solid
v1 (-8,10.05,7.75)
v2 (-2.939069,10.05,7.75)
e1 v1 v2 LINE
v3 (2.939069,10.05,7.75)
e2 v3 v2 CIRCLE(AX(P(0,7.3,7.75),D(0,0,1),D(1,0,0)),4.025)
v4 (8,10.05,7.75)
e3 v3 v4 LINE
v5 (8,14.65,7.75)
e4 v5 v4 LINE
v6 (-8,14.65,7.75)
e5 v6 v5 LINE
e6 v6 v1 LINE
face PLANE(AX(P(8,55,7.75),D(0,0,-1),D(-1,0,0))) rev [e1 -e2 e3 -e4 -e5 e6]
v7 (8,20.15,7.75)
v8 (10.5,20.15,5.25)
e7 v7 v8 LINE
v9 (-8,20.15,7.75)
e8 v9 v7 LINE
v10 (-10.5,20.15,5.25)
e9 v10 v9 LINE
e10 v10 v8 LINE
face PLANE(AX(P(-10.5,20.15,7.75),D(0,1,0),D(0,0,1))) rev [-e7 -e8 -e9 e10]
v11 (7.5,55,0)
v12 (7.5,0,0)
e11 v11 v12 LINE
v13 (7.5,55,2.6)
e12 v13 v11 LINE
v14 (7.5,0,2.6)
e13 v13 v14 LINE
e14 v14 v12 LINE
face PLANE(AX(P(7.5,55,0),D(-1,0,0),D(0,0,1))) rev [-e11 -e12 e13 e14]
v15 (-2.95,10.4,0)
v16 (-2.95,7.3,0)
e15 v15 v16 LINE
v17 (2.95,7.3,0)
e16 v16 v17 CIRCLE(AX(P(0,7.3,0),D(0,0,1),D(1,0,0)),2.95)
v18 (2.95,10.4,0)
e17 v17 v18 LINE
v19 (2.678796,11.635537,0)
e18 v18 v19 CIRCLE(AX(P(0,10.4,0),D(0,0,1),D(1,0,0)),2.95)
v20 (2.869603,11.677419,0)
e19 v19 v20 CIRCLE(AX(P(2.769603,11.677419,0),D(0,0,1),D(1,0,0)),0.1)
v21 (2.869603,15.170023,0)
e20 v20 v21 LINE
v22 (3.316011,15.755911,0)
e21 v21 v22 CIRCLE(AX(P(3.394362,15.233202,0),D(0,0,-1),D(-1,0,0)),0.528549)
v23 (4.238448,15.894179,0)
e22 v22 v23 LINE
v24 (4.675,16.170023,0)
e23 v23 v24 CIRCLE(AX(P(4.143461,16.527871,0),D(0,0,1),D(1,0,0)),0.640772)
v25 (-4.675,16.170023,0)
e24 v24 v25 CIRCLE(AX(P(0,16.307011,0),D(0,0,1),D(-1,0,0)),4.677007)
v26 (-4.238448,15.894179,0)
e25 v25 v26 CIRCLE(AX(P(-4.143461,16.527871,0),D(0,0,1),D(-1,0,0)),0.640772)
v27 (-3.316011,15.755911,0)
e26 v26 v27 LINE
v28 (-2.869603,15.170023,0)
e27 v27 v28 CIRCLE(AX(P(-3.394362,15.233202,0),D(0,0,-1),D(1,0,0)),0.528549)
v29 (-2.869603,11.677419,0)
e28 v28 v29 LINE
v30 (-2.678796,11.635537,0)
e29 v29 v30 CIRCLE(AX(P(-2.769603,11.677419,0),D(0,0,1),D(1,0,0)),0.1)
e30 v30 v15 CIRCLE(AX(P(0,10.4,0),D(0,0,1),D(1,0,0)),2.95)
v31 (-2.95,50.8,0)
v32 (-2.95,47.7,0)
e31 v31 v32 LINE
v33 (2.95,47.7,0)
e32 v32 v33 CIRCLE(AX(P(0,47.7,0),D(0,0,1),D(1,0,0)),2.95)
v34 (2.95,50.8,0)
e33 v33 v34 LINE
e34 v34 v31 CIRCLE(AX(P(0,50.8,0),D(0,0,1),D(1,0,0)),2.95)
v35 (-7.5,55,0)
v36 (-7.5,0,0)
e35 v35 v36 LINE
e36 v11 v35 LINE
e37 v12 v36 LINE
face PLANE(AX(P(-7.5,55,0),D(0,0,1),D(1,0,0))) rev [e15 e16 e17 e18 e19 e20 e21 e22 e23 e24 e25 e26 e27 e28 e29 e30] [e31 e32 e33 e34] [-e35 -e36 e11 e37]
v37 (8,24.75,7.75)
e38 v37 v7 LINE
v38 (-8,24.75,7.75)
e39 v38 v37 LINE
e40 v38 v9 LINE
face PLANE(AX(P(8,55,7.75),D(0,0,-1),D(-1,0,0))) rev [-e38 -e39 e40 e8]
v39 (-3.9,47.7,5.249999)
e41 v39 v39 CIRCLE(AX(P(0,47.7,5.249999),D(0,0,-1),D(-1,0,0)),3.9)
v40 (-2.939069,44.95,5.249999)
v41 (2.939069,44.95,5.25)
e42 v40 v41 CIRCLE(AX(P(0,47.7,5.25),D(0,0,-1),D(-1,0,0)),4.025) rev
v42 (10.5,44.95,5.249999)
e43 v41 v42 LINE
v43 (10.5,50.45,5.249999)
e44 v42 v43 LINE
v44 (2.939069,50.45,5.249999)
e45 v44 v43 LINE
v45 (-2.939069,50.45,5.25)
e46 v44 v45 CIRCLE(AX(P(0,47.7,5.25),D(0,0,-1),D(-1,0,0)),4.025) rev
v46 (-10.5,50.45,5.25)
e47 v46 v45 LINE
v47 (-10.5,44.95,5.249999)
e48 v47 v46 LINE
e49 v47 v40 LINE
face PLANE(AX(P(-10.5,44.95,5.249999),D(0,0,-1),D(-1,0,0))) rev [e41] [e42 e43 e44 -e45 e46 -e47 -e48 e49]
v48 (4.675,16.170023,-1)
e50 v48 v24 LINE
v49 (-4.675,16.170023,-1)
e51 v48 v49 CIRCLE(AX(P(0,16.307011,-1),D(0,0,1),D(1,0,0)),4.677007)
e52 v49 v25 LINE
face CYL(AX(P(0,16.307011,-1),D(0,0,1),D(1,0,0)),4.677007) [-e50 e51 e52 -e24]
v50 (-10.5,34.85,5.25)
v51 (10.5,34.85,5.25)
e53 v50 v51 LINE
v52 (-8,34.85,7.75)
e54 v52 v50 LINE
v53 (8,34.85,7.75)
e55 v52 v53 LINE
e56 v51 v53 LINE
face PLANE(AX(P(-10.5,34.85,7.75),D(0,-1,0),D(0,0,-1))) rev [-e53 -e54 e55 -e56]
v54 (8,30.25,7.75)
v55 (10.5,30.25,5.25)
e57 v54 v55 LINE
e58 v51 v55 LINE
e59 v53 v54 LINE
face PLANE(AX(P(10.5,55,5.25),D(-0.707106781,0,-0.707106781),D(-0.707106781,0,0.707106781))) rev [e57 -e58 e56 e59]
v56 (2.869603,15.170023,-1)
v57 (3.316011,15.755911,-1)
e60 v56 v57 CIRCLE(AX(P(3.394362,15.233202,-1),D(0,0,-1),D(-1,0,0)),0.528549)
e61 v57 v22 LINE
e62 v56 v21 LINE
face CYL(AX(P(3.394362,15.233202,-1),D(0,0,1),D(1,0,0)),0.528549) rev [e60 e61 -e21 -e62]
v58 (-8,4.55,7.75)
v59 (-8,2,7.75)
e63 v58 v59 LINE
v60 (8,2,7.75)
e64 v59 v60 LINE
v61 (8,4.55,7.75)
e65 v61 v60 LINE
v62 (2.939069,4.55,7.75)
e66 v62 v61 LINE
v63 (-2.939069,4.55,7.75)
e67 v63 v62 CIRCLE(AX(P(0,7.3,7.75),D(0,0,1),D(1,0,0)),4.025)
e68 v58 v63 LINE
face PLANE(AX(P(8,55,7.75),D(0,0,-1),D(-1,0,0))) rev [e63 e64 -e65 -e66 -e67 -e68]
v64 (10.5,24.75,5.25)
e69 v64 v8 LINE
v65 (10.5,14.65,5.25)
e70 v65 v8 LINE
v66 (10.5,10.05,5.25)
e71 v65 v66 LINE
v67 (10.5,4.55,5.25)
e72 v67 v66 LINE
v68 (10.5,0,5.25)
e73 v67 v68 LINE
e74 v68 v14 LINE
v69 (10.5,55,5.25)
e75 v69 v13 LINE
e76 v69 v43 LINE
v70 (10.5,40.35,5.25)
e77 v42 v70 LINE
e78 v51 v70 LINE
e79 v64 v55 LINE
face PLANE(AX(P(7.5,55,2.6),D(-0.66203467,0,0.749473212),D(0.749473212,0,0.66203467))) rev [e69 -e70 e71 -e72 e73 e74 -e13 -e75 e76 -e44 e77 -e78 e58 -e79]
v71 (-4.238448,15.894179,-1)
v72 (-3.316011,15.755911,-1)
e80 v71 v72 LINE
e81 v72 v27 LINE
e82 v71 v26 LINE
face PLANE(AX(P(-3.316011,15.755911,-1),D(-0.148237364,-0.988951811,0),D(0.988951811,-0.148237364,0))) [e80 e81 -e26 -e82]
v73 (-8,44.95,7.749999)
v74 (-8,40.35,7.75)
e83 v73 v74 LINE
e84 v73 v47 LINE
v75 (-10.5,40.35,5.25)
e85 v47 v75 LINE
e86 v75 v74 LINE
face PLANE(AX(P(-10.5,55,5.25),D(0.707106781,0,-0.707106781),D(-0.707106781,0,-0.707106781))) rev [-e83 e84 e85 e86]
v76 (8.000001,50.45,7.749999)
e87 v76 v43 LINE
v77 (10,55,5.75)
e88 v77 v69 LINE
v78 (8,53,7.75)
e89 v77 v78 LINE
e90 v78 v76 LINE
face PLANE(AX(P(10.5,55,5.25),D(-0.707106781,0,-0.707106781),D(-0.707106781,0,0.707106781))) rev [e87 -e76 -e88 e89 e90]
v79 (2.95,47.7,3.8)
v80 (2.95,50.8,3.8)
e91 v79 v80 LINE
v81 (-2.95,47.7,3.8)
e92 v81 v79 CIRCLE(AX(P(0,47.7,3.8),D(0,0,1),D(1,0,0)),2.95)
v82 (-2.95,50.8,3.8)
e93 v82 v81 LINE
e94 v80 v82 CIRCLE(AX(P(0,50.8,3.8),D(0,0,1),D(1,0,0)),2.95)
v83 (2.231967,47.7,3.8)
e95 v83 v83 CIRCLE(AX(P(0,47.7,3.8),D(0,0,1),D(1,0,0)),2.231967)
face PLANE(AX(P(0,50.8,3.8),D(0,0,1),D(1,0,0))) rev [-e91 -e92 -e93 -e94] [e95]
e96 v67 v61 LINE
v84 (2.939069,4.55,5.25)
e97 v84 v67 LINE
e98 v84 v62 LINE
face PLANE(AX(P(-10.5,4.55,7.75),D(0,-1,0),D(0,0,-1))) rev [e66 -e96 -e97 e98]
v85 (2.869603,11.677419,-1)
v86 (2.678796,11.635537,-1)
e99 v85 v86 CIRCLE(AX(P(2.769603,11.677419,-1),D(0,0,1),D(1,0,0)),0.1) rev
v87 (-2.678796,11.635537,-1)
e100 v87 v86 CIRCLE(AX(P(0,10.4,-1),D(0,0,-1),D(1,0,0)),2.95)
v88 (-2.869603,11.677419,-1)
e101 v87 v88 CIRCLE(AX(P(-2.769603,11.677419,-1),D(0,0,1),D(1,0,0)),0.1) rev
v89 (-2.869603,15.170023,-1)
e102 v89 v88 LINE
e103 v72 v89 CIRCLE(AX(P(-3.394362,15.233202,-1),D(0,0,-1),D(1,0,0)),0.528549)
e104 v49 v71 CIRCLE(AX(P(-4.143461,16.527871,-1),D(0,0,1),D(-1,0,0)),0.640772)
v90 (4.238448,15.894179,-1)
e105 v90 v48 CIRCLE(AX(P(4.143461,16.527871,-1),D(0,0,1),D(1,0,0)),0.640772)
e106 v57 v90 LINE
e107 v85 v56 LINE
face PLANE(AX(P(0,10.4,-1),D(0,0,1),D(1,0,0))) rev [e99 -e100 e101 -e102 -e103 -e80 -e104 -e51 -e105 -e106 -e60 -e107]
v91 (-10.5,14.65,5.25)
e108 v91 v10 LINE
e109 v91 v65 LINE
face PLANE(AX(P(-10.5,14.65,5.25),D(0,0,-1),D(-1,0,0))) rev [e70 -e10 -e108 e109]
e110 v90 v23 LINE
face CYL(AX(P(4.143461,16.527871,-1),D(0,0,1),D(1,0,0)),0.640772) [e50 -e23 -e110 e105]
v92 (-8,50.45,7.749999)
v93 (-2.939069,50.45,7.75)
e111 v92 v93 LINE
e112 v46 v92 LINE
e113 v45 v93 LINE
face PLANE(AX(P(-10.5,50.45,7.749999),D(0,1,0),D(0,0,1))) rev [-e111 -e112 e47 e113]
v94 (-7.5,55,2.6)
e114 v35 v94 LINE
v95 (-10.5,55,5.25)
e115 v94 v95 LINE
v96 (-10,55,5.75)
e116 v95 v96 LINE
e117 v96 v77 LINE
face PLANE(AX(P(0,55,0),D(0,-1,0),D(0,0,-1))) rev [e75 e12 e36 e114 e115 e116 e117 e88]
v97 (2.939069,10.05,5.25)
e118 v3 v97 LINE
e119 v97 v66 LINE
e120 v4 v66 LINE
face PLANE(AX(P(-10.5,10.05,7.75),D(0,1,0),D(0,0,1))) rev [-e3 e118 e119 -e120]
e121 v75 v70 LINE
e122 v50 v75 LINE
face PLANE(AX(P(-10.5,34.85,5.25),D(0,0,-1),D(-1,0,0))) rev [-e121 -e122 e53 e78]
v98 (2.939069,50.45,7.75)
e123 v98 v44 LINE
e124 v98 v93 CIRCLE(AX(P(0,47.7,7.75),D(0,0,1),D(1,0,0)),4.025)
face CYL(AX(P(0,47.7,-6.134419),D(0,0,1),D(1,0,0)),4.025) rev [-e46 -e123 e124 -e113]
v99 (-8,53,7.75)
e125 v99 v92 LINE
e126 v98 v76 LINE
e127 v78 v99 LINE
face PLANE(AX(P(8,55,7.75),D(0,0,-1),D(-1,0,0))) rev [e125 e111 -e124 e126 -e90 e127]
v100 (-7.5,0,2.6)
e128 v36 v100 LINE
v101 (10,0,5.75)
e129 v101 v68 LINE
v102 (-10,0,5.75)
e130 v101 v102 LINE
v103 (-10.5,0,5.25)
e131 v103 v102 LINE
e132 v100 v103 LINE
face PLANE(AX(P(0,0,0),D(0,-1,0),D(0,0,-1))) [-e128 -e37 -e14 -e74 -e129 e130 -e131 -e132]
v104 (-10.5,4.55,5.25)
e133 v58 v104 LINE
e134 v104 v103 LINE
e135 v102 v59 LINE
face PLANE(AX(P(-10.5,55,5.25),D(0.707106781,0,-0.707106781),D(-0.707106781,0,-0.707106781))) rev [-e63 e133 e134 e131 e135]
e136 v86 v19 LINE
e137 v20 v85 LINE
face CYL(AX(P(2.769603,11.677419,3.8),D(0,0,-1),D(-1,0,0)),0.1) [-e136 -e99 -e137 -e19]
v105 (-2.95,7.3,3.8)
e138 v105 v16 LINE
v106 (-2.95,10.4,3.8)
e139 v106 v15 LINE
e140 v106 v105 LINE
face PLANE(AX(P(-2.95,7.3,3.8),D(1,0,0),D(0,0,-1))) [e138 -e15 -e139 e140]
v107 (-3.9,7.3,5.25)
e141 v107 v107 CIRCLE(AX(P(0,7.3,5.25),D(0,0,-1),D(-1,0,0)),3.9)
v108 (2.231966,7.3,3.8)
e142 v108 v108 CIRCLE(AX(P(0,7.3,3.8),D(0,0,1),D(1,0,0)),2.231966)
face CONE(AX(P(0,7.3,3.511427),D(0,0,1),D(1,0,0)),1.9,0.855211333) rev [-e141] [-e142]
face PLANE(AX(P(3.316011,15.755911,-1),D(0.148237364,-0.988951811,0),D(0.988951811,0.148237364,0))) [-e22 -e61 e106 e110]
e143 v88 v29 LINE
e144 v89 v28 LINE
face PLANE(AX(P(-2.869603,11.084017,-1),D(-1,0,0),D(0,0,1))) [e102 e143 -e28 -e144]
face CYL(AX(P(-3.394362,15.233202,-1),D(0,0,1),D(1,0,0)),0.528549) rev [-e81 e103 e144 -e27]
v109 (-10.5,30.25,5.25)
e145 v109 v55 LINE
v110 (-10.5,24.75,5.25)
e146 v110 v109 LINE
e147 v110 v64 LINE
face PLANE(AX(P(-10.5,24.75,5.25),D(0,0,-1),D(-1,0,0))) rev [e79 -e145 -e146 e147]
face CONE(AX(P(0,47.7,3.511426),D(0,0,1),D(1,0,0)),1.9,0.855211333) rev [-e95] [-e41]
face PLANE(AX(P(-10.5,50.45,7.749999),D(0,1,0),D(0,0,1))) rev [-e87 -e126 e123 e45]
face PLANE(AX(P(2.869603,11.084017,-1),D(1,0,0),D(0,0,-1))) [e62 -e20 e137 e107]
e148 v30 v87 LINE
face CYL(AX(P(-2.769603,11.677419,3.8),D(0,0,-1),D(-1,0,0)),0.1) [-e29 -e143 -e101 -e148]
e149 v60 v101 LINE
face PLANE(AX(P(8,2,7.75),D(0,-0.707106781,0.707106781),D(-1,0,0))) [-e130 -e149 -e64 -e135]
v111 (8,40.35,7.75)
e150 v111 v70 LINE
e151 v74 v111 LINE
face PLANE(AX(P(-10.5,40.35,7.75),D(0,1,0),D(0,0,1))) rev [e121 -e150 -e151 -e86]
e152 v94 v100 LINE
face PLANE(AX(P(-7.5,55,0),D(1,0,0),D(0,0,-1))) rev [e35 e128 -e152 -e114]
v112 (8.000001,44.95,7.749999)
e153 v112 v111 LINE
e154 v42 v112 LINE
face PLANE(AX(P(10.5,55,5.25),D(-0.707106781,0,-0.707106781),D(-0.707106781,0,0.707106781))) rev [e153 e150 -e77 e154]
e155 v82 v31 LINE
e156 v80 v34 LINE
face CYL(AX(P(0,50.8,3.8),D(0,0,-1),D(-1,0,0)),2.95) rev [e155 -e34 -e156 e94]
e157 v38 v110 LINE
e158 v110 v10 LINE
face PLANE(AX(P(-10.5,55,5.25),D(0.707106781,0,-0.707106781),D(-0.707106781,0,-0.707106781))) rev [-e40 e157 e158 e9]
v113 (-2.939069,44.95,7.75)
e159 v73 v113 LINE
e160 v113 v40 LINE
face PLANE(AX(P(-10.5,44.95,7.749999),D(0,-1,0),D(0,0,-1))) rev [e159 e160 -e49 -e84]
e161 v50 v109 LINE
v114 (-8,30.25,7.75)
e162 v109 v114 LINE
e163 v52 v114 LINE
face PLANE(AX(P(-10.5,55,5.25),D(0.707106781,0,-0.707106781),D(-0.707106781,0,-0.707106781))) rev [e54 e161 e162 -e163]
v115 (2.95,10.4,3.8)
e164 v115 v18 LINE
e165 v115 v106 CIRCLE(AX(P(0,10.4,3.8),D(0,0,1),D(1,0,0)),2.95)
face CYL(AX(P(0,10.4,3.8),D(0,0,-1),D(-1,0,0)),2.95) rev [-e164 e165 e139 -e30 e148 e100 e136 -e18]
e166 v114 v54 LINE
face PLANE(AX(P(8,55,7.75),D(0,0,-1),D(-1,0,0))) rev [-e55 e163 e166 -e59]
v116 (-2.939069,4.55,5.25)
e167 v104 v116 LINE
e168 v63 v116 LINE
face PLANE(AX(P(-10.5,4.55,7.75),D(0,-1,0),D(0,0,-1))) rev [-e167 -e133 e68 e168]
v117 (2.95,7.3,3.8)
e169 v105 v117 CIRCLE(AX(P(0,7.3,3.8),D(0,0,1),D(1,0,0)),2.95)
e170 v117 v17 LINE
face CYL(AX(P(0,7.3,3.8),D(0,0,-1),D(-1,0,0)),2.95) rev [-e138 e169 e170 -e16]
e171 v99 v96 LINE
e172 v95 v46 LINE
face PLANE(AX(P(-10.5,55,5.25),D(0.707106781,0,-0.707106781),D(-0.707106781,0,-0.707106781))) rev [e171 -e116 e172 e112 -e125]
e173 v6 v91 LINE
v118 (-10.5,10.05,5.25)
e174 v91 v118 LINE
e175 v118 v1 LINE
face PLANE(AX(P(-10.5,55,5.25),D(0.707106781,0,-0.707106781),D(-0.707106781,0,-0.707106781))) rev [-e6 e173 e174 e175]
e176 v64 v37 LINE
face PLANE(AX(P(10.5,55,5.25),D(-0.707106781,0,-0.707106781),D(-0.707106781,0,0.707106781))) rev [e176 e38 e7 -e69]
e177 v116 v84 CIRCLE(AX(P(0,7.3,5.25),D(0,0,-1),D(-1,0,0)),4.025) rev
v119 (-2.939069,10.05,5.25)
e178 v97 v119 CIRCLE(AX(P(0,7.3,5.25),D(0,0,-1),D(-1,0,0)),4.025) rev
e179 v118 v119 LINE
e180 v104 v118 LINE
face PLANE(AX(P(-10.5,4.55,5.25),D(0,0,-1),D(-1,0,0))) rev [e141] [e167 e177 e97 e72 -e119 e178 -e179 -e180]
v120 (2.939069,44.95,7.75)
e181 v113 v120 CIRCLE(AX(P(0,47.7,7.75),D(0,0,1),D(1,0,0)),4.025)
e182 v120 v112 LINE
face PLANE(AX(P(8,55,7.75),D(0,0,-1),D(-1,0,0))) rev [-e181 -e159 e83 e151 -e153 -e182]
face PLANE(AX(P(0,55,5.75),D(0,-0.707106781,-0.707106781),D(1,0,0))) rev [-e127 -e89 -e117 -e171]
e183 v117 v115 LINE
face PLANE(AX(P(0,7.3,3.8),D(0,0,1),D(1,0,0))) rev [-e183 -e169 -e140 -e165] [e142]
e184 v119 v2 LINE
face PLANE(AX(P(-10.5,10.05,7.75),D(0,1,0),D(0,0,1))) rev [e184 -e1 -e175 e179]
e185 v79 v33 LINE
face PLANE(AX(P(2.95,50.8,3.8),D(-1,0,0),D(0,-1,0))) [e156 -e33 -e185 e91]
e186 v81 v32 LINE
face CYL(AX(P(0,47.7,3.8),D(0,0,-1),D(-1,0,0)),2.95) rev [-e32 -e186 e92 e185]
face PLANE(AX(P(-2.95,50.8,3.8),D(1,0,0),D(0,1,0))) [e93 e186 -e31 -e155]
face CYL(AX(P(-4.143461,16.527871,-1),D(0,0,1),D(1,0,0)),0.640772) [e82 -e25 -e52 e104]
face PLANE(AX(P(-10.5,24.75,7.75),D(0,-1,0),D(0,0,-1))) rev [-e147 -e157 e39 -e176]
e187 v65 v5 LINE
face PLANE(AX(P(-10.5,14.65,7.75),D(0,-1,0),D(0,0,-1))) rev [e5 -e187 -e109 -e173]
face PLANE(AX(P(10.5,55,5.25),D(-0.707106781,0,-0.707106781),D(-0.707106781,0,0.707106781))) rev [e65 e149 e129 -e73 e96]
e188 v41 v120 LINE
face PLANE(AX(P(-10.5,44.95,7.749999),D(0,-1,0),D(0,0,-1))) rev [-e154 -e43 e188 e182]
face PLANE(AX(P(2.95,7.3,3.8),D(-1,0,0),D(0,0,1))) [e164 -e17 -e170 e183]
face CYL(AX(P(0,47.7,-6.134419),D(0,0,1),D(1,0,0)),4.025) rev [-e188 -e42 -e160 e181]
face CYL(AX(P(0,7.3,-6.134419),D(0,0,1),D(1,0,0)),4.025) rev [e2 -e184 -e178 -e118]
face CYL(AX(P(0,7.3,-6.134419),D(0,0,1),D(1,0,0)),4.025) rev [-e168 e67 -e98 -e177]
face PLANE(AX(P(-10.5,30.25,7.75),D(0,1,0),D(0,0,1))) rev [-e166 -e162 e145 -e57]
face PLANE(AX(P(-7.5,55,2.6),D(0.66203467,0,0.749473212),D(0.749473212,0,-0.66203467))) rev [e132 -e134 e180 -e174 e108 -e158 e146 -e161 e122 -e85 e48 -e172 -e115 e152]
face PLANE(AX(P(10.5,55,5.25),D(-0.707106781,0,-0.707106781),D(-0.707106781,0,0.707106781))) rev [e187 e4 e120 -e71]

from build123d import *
from OCP.BRepAlgoAPI import BRepAlgoAPI_Cut
from OCP.TopTools import TopTools_ListOfShape

# Parameters (mm, degrees)
EXTRUDE_1_DEPTH          = 55
CUT_EXTRUDE_1_DEPTH      = 57.52709527297507
CUT_EXTRUDE_1_DEPTH_BACK = 57.52709527297507
SKETCH_2_W               = 2.5000000000000018
SKETCH_2_H               = 5.5000000000000036
SKETCH_2_H_2             = 5.499999999999993
SKETCH_2_H_3             = 5.5
CHAMFER_1_SIZE           = 2
SKETCH_3_R               = 1.8999999999999997
SKETCH_3_R_2             = 1.9000000000000001
CUT_EXTRUDE_2_DEPTH      = 57.52709527297507
SKETCH_4_R               = 4.025
CUT_EXTRUDE_3_DEPTH      = 2.5
CUT_EXTRUDE_4_DEPTH      = 3.8
EXTRUDE_START            = -1
EXTRUDE_2_DEPTH          = 1
FILLET_1_R               = 0.1


with BuildPart() as part:
    # 스케치1 → 보스-돌출1 (new body)
    with BuildSketch(Plane(origin=(0, 0, 0), x_dir=(1, 0, 0), z_dir=(0, 1, 0))):
        Polygon((-7.5, 0), (7.5, 0), (7.5, -2.5999999999999983), (10.5, -5.249999999999997), (8.000000000000002, -7.749999999999999), (-7.999999999999998, -7.750000000000001), (-10.5, -5.25), (-7.5, -2.6), align=None)
    extrude(amount=EXTRUDE_1_DEPTH)


with BuildPart() as cut_extrude_1_tool:
    # 스케치2 → 컷-돌출1 (new, two sides: drawn at the far end of the back side and taken through both)
    with BuildSketch(Plane(origin=(0, 0, 0), x_dir=(0, 0, -1), z_dir=(1, 0, 0)).offset(-CUT_EXTRUDE_1_DEPTH_BACK)):
        Polygon((-7.749999999999999, 4.549999999999999), (-5.249999999999997, 4.549999999999999), (-5.249999999999997, 10.049999999999997), (-7.749999999999999, 10.049999999999999), align=None)
        Polygon((-7.749999834765438, 20.150000000000002), (-5.249999834765436, 20.150000000000002), (-5.249999834765436, 14.649999999999999), (-7.749999834765438, 14.65), align=None)
        with Locations((-6.499999669530876, 27.5)):
            Rectangle(SKETCH_2_W, SKETCH_2_H)
        with Locations((-6.499999504296315, 37.599999999999994)):
            Rectangle(SKETCH_2_W, SKETCH_2_H_2)
        with Locations((-6.499999339061754, 47.699999999999996)):
            Rectangle(SKETCH_2_W, SKETCH_2_H_3)
    extrude(amount=CUT_EXTRUDE_1_DEPTH + CUT_EXTRUDE_1_DEPTH_BACK)


with BuildPart() as part_1:
    add(part.part)

    # 컷-돌출1: cut by cut_extrude_1_tool, with a tolerance
    cut_extrude_1_stock = TopTools_ListOfShape()
    cut_extrude_1_stock.Append(part_1.part.wrapped)
    cut_extrude_1_tools = TopTools_ListOfShape()
    cut_extrude_1_tools.Append(cut_extrude_1_tool.part.wrapped)
    cut_extrude_1_cut = BRepAlgoAPI_Cut()
    cut_extrude_1_cut.SetArguments(cut_extrude_1_stock)
    cut_extrude_1_cut.SetTools(cut_extrude_1_tools)
    cut_extrude_1_cut.SetFuzzyValue(0.00001)
    cut_extrude_1_cut.Build()
    add(Compound.cast(cut_extrude_1_cut.Shape()).solids(), mode=Mode.REPLACE)

    # 모따기1
    chamfer_1_edges = [part_1.edges().sort_by_distance(p)[0] for p in [
        (1.78e-15, 55, 7.75),
        (1.78e-15, 0, 7.75),
    ]]
    chamfer(chamfer_1_edges, length=CHAMFER_1_SIZE)

    # 스케치3 → 컷-돌출2 (cut, through all)
    with BuildSketch(Plane.XY):
        with Locations(Location((-3.47e-15, 47.699999999999996, 0), (0, 0, 180))):
            Circle(SKETCH_3_R)
        with Locations(Location((-3.47e-15, 7.299999999999997, 0), (0, 0, 180))):
            Circle(SKETCH_3_R_2)
    extrude(amount=CUT_EXTRUDE_2_DEPTH, mode=Mode.SUBTRACT)

    # 스케치4 → 컷-돌출3 (cut)
    with BuildSketch(Plane.XY.offset(7.75)):
        with Locations((-4.31e-15, 7.299999999999997)):
            Circle(SKETCH_4_R)
        with Locations((-4.31e-15, 47.699999999999996)):
            Circle(SKETCH_4_R)
    extrude(amount=-CUT_EXTRUDE_3_DEPTH, mode=Mode.SUBTRACT)

    # 모따기2
    # the kernel refuses this chamfer: 2, 1.738573476 mm, written as the material it takes off along each edge
    with BuildSketch(Plane(origin=(-3.47e-15, 47.699999999999996, 5.249999339061753), x_dir=(-1, 0, 0), z_dir=(0, -1, 0))) as chamfer_2_piece_1_section:
        with BuildLine():
            Line((3.9603767664178213, -0.05248472231924062), (1.839623233582178, 1.7910581979517))
            Line((1.839623233582178, 1.7910581979517), (1.799623233582178, 1.7910581979517))
            ThreePointArc((1.799623233582178, 1.7910581979517), (1.8599999999999997, 0.8955290989758504), (1.8599999999999997, 0))
            Line((1.8599999999999997, 0), (1.8999999999999997, -0.04000000000000004))
            ThreePointArc((1.8999999999999997, -0.04000000000000004), (2.9301883832089106, -0.04000000000000004), (3.9603767664178213, -0.09248472231924065))
            Line((3.9603767664178213, -0.09248472231924065), (3.9603767664178213, -0.05248472231924062))
        make_face()
    chamfer_2_piece_1 = revolve(axis=Axis((-3.47e-15, 47.699999999999996, 5.249999339061753), (0, 0, -1)), mode=Mode.PRIVATE)
    chamfer_2_piece_1 = split(chamfer_2_piece_1, bisect_by=Plane(origin=(-3.47e-15, 50.449999999999996, 5.249999339061753), z_dir=(0, -1, 0)), keep=Keep.TOP, mode=Mode.PRIVATE)
    chamfer_2_piece_1 = split(chamfer_2_piece_1, bisect_by=Plane(origin=(-3.47e-15, 44.949999999999996, 5.249999339061753), z_dir=(0, 1, 0)), keep=Keep.TOP, mode=Mode.PRIVATE)
    add(chamfer_2_piece_1, mode=Mode.SUBTRACT)
    with BuildSketch(Plane(origin=(-3.47e-15, 47.699999999999996, 5.249999339061753), x_dir=(-1, 0, 0), z_dir=(0, -1, 0))) as chamfer_2_piece_2_section:
        with BuildLine():
            Line((3.9603767664178213, -0.05248472231924062), (1.839623233582178, 1.7910581979517))
            Line((1.839623233582178, 1.7910581979517), (1.799623233582178, 1.7910581979517))
            ThreePointArc((1.799623233582178, 1.7910581979517), (1.8599999999999997, 0.8955290989758504), (1.8599999999999997, 0))
            Line((1.8599999999999997, 0), (1.8999999999999997, -0.04000000000000004))
            ThreePointArc((1.8999999999999997, -0.04000000000000004), (2.9301883832089106, -0.04000000000000004), (3.9603767664178213, -0.09248472231924065))
            Line((3.9603767664178213, -0.09248472231924065), (3.9603767664178213, -0.05248472231924062))
        make_face()
    chamfer_2_piece_2 = revolve(axis=Axis((-3.47e-15, 47.699999999999996, 5.249999339061753), (0, 0, -1)), mode=Mode.PRIVATE)
    chamfer_2_piece_2 = split(chamfer_2_piece_2, bisect_by=Plane(origin=(-3.47e-15, 44.949999999999996, 5.249999339061753), z_dir=(0, -1, 0)), keep=Keep.TOP, mode=Mode.PRIVATE)
    add(chamfer_2_piece_2, mode=Mode.SUBTRACT)
    with BuildSketch(Plane(origin=(-3.47e-15, 47.699999999999996, 5.249999339061753), x_dir=(-1, 0, 0), z_dir=(0, -1, 0))) as chamfer_2_piece_3_section:
        with BuildLine():
            Line((3.9603767664178213, -0.05248472231924062), (1.839623233582178, 1.7910581979517))
            Line((1.839623233582178, 1.7910581979517), (1.799623233582178, 1.7910581979517))
            ThreePointArc((1.799623233582178, 1.7910581979517), (1.8599999999999997, 0.8955290989758504), (1.8599999999999997, 0))
            Line((1.8599999999999997, 0), (1.8999999999999997, -0.04000000000000004))
            ThreePointArc((1.8999999999999997, -0.04000000000000004), (2.9301883832089106, -0.04000000000000004), (3.9603767664178213, -0.09248472231924065))
            Line((3.9603767664178213, -0.09248472231924065), (3.9603767664178213, -0.05248472231924062))
        make_face()
    chamfer_2_piece_3 = revolve(axis=Axis((-3.47e-15, 47.699999999999996, 5.249999339061753), (0, 0, -1)), mode=Mode.PRIVATE)
    chamfer_2_piece_3 = split(chamfer_2_piece_3, bisect_by=Plane(origin=(-3.47e-15, 50.449999999999996, 5.249999339061753), z_dir=(0, 1, 0)), keep=Keep.TOP, mode=Mode.PRIVATE)
    add(chamfer_2_piece_3, mode=Mode.SUBTRACT)
    with BuildSketch(Plane(origin=(-3.47e-15, 7.299999999999997, 5.249999999999997), x_dir=(-1, 0, 0), z_dir=(0, -1, 0))) as chamfer_2_piece_4:
        with BuildLine():
            Line((3.960376766417822, -0.05248472231924062), (1.8396232335821785, 1.7910581979517))
            Line((1.8396232335821785, 1.7910581979517), (1.7996232335821785, 1.7910581979517))
            ThreePointArc((1.7996232335821785, 1.7910581979517), (1.86, 0.8955290989758504), (1.86, 0))
            Line((1.86, 0), (1.9000000000000001, -0.04000000000000004))
            ThreePointArc((1.9000000000000001, -0.04000000000000004), (2.930188383208911, -0.04000000000000004), (3.960376766417822, -0.09248472231924065))
            Line((3.960376766417822, -0.09248472231924065), (3.960376766417822, -0.05248472231924062))
        make_face()
    revolve(axis=Axis((-3.47e-15, 7.299999999999997, 5.249999999999997), (0, 0, -1)), mode=Mode.SUBTRACT)

    # 스케치5 → 컷-돌출4 (cut)
    with BuildSketch(Plane.XY):
        with BuildLine():
            Line((2.95, 50.79999999999999), (2.9500000000000006, 47.699999999999996))
            ThreePointArc((2.9500000000000006, 47.699999999999996), (-4.01e-15, 44.75), (-2.9499999999999997, 47.699999999999996))
            Line((-2.9499999999999997, 47.699999999999996), (-2.95, 50.79999999999999))
            ThreePointArc((-2.95, 50.79999999999999), (1.7e-16, 53.74999999999999), (2.95, 50.79999999999999))
        make_face()
        with BuildLine():
            Line((-2.95, 7.299999999999997), (-2.95, 10.400000000000002))
            ThreePointArc((-2.95, 10.400000000000002), (1.8e-16, 13.350000000000001), (2.95, 10.400000000000002))
            Line((2.95, 10.400000000000002), (2.95, 7.299999999999997))
            ThreePointArc((2.95, 7.299999999999997), (-4.01e-15, 4.3500000000000005), (-2.95, 7.299999999999997))
        make_face()
    extrude(amount=CUT_EXTRUDE_4_DEPTH, mode=Mode.SUBTRACT)

    # 스케치6 → 보스-돌출2 (add)
    with BuildSketch(Plane.XY.offset(EXTRUDE_START)):
        with BuildLine():
            Line((-2.8696028673118352, 11.084017093292044), (-2.8696028673118352, 15.17002285126479))
            ThreePointArc((-2.8696028673118352, 15.17002285126479), (-2.97394354223574, 15.553533335617065), (-3.3160113650873604, 15.75591137943913))
            Line((-3.3160113650873604, 15.75591137943913), (-4.238447681040065, 15.894178508998346))
            ThreePointArc((-4.238447681040065, 15.894178508998346), (-4.485741808137749, 15.986176732767143), (-4.675, 16.17002285126479))
            ThreePointArc((-4.675, 16.17002285126479), (-3.3552259820417296, 19.565361197223766), (0, 20.984017093292046))
            ThreePointArc((0, 20.984017093292046), (3.355225982041729, 19.565361197223766), (4.675, 16.17002285126479))
            ThreePointArc((4.675, 16.17002285126479), (4.485741808137749, 15.986176732767143), (4.238447681040065, 15.894178508998346))
            Line((4.238447681040065, 15.894178508998346), (3.3160113650873604, 15.75591137943913))
            ThreePointArc((3.3160113650873604, 15.75591137943913), (2.9739435422357396, 15.553533335617065), (2.8696028673118352, 15.17002285126479))
            Line((2.8696028673118352, 15.17002285126479), (2.8696028673118352, 11.084017093292044))
            ThreePointArc((2.8696028673118352, 11.084017093292044), (1.8e-16, 13.350000000000001), (-2.8696028673118352, 11.084017093292044))
        make_face()
    extrude(amount=EXTRUDE_2_DEPTH)

    # 필렛1
    fillet_1_edges = [part_1.edges().sort_by_distance(p)[0] for p in [
        (-2.8696028673118352, 11.084017093292044, -0.5),
        (2.8696028673118352, 11.084017093292044, -0.5),
    ]]
    fillet(fillet_1_edges, radius=FILLET_1_R)


solid = part_1.part
